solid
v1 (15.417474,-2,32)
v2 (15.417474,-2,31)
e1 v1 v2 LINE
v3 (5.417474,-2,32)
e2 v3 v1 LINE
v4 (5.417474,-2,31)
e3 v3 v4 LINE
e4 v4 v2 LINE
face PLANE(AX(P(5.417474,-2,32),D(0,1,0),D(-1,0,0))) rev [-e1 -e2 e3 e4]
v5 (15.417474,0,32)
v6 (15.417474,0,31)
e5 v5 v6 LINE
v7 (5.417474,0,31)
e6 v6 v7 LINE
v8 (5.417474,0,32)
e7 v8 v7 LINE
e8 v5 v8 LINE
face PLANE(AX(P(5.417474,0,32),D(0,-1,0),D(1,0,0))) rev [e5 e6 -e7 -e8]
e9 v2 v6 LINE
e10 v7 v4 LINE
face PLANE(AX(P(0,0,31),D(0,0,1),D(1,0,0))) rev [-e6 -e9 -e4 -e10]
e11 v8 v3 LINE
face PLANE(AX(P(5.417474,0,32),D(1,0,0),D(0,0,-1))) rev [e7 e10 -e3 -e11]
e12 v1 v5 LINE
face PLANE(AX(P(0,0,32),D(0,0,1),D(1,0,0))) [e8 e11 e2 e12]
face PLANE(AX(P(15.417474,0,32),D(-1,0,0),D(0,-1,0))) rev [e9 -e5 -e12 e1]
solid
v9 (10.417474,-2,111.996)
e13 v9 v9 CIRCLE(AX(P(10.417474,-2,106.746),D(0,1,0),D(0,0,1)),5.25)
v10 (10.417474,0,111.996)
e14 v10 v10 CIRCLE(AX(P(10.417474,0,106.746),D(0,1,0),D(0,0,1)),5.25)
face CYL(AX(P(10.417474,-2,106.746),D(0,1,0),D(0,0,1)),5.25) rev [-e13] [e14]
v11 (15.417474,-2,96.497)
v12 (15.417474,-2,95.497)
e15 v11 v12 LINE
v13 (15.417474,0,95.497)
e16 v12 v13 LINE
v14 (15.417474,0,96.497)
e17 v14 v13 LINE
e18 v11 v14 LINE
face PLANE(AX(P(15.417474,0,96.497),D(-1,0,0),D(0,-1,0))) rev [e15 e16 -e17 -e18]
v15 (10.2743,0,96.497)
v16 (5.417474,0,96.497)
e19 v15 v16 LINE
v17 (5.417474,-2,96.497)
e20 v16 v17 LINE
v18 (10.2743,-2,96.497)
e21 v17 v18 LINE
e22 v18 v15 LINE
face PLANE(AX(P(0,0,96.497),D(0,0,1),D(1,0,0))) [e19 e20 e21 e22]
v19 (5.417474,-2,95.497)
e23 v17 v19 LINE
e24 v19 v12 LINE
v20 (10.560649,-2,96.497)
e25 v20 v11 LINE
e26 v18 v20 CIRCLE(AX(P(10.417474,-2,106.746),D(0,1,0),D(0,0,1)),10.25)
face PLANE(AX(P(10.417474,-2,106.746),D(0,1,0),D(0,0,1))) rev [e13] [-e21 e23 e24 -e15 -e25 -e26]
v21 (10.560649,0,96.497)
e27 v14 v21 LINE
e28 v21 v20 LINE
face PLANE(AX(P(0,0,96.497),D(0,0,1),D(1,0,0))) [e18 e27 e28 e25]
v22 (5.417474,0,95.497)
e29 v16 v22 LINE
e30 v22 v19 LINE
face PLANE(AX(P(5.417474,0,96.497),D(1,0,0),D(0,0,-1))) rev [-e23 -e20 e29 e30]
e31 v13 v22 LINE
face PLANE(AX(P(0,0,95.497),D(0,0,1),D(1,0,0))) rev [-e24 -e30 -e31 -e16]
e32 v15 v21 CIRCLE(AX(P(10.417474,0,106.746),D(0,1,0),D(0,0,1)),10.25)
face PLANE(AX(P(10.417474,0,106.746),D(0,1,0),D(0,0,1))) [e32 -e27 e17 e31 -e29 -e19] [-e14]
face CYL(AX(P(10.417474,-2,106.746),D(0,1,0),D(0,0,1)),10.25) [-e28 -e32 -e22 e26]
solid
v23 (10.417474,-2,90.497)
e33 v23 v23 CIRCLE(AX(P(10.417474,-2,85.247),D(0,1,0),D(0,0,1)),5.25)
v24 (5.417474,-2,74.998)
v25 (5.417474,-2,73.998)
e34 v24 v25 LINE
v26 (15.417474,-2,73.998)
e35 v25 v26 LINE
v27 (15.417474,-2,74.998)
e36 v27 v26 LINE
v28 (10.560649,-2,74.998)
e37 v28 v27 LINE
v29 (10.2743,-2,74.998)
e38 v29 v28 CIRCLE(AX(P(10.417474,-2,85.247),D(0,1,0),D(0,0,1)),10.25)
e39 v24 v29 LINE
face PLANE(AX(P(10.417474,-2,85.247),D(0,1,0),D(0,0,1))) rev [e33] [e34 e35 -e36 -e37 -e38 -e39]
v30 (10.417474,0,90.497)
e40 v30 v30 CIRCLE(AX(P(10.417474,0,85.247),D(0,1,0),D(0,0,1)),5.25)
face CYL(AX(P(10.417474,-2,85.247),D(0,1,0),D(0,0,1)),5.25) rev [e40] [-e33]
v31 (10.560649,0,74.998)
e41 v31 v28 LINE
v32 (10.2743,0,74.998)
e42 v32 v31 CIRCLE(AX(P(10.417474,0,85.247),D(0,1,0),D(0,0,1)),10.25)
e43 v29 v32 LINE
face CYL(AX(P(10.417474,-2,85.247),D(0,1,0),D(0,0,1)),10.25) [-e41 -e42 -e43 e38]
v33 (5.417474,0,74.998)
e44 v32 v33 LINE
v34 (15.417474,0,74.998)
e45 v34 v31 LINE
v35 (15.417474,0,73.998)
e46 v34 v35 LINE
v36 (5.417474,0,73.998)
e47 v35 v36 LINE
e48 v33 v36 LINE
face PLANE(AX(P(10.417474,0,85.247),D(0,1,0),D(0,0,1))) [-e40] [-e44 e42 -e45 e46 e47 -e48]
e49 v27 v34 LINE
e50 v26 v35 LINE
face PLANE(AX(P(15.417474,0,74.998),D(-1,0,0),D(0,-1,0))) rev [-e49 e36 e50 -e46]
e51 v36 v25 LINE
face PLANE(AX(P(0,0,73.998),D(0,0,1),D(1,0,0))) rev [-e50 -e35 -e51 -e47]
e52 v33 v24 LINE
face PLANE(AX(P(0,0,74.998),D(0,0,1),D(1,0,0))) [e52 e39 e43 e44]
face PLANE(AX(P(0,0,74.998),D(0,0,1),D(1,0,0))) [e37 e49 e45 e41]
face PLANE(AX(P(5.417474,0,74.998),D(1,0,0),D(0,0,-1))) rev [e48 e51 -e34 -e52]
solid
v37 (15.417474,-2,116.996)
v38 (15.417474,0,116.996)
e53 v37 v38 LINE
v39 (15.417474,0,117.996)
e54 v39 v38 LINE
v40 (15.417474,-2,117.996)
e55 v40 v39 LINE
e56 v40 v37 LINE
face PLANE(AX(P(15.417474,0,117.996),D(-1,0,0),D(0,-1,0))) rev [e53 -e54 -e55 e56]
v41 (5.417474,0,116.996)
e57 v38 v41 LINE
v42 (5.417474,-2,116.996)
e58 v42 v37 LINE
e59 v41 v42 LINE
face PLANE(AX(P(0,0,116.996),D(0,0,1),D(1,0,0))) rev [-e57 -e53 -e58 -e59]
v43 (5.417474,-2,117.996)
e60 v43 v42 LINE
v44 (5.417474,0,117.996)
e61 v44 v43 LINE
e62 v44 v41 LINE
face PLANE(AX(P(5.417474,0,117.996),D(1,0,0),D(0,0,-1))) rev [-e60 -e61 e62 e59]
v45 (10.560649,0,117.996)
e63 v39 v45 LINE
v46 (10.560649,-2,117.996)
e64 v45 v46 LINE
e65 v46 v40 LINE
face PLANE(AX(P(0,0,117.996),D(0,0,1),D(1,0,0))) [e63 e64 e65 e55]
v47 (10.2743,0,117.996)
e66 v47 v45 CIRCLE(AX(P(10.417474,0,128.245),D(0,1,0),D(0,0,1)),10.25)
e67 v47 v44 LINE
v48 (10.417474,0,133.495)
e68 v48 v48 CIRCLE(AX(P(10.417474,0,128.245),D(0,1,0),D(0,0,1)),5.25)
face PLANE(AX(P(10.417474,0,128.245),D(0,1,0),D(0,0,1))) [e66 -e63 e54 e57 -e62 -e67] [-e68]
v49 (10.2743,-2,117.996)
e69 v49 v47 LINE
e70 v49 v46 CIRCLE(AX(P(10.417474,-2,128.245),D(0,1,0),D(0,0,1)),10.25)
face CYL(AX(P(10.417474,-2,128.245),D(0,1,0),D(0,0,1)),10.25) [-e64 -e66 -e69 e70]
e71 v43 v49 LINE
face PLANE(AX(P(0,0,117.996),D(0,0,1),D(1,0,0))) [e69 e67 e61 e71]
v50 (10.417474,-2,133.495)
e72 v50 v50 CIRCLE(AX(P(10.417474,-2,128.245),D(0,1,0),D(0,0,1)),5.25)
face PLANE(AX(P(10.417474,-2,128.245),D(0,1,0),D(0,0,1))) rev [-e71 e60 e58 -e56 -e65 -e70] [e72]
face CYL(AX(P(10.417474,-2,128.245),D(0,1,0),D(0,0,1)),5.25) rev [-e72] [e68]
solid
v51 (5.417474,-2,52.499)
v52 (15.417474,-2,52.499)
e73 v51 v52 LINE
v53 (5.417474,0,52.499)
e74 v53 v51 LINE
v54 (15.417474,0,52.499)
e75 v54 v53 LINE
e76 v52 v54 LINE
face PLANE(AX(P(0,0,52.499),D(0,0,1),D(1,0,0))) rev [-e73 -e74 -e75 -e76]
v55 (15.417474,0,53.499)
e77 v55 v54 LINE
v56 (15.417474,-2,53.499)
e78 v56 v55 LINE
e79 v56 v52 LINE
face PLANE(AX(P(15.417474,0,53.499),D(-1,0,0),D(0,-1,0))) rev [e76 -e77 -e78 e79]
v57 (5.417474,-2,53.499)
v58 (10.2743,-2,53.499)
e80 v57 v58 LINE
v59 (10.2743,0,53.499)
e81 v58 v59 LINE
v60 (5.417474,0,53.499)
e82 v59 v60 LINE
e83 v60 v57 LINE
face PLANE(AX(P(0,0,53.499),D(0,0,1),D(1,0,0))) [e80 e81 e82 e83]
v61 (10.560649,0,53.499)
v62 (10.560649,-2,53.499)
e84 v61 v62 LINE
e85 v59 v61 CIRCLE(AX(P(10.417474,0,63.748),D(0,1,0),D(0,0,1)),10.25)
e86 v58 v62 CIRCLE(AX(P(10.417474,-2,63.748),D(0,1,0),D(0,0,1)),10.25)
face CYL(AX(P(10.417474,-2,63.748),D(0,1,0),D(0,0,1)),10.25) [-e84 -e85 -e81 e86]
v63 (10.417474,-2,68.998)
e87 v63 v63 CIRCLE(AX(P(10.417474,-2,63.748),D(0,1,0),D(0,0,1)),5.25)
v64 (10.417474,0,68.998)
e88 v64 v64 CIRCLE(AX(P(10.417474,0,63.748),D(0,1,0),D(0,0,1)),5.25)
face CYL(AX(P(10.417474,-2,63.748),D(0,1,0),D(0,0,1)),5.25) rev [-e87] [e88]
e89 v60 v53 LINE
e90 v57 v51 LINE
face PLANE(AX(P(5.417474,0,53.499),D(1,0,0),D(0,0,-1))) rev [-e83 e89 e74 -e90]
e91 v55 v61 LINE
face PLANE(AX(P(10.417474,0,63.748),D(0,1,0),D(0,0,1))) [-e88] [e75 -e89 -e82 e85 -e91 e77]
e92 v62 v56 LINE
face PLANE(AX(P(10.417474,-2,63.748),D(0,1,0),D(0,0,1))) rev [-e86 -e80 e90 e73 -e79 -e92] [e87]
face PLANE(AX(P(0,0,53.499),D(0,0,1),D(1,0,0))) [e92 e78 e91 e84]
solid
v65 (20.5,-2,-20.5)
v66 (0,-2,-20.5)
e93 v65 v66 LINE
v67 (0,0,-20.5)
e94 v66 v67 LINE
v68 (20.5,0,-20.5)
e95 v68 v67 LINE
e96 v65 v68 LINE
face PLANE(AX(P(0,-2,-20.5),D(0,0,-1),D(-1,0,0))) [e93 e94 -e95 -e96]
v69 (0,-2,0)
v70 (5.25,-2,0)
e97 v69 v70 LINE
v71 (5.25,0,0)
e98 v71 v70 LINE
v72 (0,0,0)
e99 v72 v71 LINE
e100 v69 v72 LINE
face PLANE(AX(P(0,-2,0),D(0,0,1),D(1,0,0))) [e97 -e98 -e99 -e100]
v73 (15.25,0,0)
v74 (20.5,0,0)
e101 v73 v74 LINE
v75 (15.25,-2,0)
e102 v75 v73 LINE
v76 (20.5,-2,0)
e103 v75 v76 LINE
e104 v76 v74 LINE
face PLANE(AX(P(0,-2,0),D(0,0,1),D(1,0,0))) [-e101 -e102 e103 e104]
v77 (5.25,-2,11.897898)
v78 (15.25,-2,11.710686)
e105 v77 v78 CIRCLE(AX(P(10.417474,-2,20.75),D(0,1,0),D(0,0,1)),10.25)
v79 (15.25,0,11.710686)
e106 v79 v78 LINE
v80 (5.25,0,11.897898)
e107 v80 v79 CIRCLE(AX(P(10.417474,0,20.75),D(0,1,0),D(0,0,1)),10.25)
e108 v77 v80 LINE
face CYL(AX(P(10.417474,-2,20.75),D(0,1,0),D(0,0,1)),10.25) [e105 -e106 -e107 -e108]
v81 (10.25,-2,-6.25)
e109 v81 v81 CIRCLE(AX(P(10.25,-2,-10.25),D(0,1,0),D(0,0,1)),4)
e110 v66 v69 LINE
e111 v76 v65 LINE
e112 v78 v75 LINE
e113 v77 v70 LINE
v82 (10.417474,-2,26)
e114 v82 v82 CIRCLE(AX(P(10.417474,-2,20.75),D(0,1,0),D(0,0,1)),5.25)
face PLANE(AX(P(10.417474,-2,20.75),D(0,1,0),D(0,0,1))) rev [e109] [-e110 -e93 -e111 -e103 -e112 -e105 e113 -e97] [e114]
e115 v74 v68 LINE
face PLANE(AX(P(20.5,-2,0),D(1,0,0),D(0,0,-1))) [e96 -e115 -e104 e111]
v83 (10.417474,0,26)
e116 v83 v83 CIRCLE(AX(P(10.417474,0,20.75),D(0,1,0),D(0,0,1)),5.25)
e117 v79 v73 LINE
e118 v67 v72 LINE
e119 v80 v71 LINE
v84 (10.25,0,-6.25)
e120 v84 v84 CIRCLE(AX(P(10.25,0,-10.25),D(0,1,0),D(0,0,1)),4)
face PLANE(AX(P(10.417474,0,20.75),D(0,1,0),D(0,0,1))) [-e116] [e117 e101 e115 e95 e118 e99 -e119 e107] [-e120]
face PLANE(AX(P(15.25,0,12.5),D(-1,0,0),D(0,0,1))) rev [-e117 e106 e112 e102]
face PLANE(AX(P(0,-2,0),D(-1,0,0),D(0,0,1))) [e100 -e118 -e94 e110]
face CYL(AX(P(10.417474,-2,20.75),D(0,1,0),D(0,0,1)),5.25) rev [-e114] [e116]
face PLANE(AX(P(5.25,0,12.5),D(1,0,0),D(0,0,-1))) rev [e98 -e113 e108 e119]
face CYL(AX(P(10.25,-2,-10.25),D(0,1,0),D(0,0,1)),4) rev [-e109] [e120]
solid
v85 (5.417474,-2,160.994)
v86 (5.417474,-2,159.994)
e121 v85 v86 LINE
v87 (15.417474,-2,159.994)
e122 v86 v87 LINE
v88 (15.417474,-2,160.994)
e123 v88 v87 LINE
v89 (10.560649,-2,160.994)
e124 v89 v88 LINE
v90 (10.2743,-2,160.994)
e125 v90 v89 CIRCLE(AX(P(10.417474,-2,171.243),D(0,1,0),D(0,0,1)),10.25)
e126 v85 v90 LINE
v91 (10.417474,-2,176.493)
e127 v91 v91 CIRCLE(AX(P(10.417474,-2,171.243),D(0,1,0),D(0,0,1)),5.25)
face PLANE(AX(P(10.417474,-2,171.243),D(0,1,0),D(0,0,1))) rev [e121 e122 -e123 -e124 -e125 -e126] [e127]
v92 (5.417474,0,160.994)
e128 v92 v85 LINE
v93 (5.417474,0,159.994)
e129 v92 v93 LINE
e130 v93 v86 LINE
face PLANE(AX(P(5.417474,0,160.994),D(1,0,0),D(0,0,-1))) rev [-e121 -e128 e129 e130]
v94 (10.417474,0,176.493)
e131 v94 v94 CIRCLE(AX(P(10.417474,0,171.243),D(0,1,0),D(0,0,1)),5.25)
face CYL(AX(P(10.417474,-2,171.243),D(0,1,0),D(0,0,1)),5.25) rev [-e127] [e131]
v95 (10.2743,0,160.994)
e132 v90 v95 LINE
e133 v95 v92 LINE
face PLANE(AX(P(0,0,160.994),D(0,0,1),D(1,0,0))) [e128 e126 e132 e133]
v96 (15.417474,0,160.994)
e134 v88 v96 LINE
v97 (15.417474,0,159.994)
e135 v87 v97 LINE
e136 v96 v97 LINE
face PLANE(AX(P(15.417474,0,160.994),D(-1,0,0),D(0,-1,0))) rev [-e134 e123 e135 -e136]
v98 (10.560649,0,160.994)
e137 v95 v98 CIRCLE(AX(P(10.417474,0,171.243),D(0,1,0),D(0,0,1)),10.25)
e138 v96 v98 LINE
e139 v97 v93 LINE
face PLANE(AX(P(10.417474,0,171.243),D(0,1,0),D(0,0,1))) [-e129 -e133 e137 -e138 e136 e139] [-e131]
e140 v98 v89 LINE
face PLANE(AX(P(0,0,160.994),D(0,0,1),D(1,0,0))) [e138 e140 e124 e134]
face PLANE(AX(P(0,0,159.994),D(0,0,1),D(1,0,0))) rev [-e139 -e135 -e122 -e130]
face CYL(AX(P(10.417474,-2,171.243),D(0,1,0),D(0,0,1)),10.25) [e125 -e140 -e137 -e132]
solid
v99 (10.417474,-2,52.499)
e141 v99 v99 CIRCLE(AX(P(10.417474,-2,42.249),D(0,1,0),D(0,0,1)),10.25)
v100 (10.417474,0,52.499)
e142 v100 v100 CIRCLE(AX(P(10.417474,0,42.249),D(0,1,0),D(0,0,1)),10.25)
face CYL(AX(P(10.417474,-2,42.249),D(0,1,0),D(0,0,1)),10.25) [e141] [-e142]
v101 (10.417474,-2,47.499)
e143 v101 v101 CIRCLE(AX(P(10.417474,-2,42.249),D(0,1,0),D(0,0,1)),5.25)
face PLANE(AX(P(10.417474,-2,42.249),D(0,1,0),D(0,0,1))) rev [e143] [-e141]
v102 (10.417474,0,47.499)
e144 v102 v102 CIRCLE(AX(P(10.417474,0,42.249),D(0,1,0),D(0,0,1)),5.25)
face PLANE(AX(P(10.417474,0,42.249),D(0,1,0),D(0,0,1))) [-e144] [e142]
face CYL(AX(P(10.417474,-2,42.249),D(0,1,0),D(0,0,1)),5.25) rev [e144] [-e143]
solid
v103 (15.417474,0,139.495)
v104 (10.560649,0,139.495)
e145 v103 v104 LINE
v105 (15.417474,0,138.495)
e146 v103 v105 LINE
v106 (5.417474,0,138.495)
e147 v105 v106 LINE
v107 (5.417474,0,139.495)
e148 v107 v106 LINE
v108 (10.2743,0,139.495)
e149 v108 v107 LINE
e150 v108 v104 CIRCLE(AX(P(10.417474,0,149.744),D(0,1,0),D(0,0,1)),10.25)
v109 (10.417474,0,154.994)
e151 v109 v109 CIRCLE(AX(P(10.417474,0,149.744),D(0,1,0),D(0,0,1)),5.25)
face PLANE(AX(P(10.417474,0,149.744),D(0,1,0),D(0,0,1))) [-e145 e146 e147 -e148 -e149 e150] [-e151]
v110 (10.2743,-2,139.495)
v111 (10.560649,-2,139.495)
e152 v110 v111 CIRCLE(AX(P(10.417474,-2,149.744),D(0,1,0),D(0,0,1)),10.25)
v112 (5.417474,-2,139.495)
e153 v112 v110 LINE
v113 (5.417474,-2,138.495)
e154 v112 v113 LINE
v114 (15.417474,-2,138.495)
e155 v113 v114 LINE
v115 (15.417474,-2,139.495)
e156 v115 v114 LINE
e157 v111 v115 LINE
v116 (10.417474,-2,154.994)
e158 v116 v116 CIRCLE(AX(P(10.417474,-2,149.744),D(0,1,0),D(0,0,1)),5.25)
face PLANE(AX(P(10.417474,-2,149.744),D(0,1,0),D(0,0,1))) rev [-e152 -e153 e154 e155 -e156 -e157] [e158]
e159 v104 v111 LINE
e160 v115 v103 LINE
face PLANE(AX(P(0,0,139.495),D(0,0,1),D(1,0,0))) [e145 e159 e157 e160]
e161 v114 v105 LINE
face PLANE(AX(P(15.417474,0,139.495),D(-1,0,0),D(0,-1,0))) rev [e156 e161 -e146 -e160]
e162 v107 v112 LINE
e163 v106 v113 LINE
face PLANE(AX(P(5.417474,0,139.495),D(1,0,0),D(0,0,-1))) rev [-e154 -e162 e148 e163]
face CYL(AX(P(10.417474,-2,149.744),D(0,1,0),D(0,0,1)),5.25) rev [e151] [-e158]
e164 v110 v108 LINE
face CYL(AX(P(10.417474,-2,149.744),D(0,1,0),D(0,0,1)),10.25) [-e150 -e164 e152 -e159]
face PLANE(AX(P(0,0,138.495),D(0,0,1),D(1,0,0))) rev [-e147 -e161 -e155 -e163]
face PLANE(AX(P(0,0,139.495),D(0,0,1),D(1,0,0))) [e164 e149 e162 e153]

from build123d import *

# Parameters (mm, degrees)
SKETCH1_W               = 20.5
SKETCH1_H               = 20.5
BOSS_EXTRUDE1_DEPTH     = 2
SKETCH2_R               = 4
CUT_EXTRUDE1_DEPTH      = 2
SKETCH3_W               = 10
SKETCH3_H               = 2
BOSS_EXTRUDE2_DEPTH     = 12.5
SKETCH6_R               = 10.25
BOSS_EXTRUDE3_DEPTH     = 2
SKETCH7_R               = 5.25
CUT_EXTRUDE2_DEPTH      = 2
SKETCH8_W               = 10
SKETCH8_H               = 2
BOSS_EXTRUDE4_DEPTH     = 1
LPATTERN1_START         = -2
LPATTERN1_OUTLINE_R     = 5.25
LPATTERN1_DEPTH         = 2
LPATTERN1_2_OUTLINE_R   = 5.25
LPATTERN1_2_DEPTH       = 2
LPATTERN1_3_OUTLINE_R   = 5.25
LPATTERN1_3_DEPTH       = 2
LPATTERN1_4_OUTLINE_R   = 5.25
LPATTERN1_4_DEPTH       = 2
LPATTERN1_5_OUTLINE_R   = 5.25
LPATTERN1_5_DEPTH       = 2
LPATTERN1_6_OUTLINE_R   = 5.25
LPATTERN1_6_DEPTH       = 2
LPATTERN1_7_OUTLINE_R   = 10.25
LPATTERN1_7_OUTLINE_R_2 = 5.25
LPATTERN1_7_DEPTH       = 2


with BuildPart() as part:
    # Sketch1 → Boss-Extrude1 (new body)
    with BuildSketch(Plane(origin=(0, 0, 0), x_dir=(1, 0, 0), z_dir=(0, 1, 0))):
        with Locations((10.25, 10.25)):
            Rectangle(SKETCH1_W, SKETCH1_H)
    extrude(amount=-BOSS_EXTRUDE1_DEPTH)

    # Sketch2 → Cut-Extrude1 (cut)
    with BuildSketch(Plane(origin=(0, 0, 0), x_dir=(1, 0, 0), z_dir=(0, 1, 0))):
        with Locations(Location((10.25, 10.25, 0), (0, 0, 270))):
            Circle(SKETCH2_R)
    extrude(amount=-CUT_EXTRUDE1_DEPTH, mode=Mode.SUBTRACT)

    # Sketch3 → Boss-Extrude2 (add)
    with BuildSketch(Plane.XY):
        with Locations((10.25, -1)):
            Rectangle(SKETCH3_W, SKETCH3_H)
    extrude(amount=BOSS_EXTRUDE2_DEPTH)


with BuildPart() as body_2:
    # Sketch6 → Boss-Extrude3 (new body)
    with BuildSketch(Plane(origin=(0, 0, 0), x_dir=(1, 0, 0), z_dir=(0, 1, 0))):
        with Locations(Location((10.417474337, -20.75, 0), (0, 0, 270))):
            Circle(SKETCH6_R)
    extrude(amount=-BOSS_EXTRUDE3_DEPTH)


with BuildPart() as part_1:
    add(part.part)

    # Intersect2: read off the stored shape, not the designer's step
    # Intersect2: union body 2
    add(body_2.part)

    # Sketch7 → Cut-Extrude2 (cut)
    with BuildSketch(Plane(origin=(0, 0, 0), x_dir=(1, 0, 0), z_dir=(0, 1, 0))):
        with Locations(Location((10.417474337, -20.75, 0), (0, 0, 270))):
            Circle(SKETCH7_R)
    extrude(amount=-CUT_EXTRUDE2_DEPTH, mode=Mode.SUBTRACT)


with BuildPart() as body_2_2:
    # Sketch8 → Boss-Extrude4 (new body)
    with BuildSketch(Plane.XY.offset(31)):
        with Locations((10.417474337, -1)):
            Rectangle(SKETCH8_W, SKETCH8_H)
    extrude(amount=BOSS_EXTRUDE4_DEPTH)


with BuildPart() as body_3:
    # LPattern1: read off the stored shape, not the designer's step
    # LPattern1 outline → LPattern1 (new body)
    with BuildSketch(Plane(origin=(0, 0, 0), x_dir=(1, 0, 0), z_dir=(0, 1, 0)).offset(LPATTERN1_START)):
        with BuildLine():
            Line((5.417474337, -160.994), (10.274299619, -160.994))
            ThreePointArc((10.274299619, -160.994), (10.417474338, -181.493), (10.560649056, -160.994))
            Line((10.560649056, -160.994), (15.417474337, -160.994))
            Line((15.417474337, -160.994), (15.417474337, -159.994))
            Line((15.417474337, -159.994), (5.417474337, -159.994))
            Line((5.417474337, -159.994), (5.417474337, -160.994))
        make_face()
        with Locations((10.417474337, -171.243)):
            Circle(LPATTERN1_OUTLINE_R, mode=Mode.SUBTRACT)
    extrude(amount=LPATTERN1_DEPTH)


with BuildPart() as body_4:
    # LPattern1 2 outline → LPattern1 2 (new body)
    with BuildSketch(Plane(origin=(0, 0, 0), x_dir=(1, 0, 0), z_dir=(0, 1, 0)).offset(LPATTERN1_START)):
        with BuildLine():
            Line((5.417474337, -139.495), (10.274299619, -139.495))
            ThreePointArc((10.274299619, -139.495), (10.417474338, -159.994), (10.560649056, -139.495))
            Line((10.560649056, -139.495), (15.417474337, -139.495))
            Line((15.417474337, -139.495), (15.417474337, -138.495))
            Line((15.417474337, -138.495), (5.417474337, -138.495))
            Line((5.417474337, -138.495), (5.417474337, -139.495))
        make_face()
        with Locations((10.417474337, -149.744)):
            Circle(LPATTERN1_2_OUTLINE_R, mode=Mode.SUBTRACT)
    extrude(amount=LPATTERN1_2_DEPTH)


with BuildPart() as body_5:
    # LPattern1 3 outline → LPattern1 3 (new body)
    with BuildSketch(Plane(origin=(0, 0, 0), x_dir=(1, 0, 0), z_dir=(0, 1, 0)).offset(LPATTERN1_START)):
        with BuildLine():
            Line((5.417474337, -117.996), (10.274299619, -117.996))
            ThreePointArc((10.274299619, -117.996), (10.417474338, -138.495), (10.560649056, -117.996))
            Line((10.560649056, -117.996), (15.417474337, -117.996))
            Line((15.417474337, -117.996), (15.417474337, -116.996))
            Line((15.417474337, -116.996), (5.417474337, -116.996))
            Line((5.417474337, -116.996), (5.417474337, -117.996))
        make_face()
        with Locations((10.417474337, -128.245)):
            Circle(LPATTERN1_3_OUTLINE_R, mode=Mode.SUBTRACT)
    extrude(amount=LPATTERN1_3_DEPTH)


with BuildPart() as body_6:
    # LPattern1 4 outline → LPattern1 4 (new body)
    with BuildSketch(Plane(origin=(0, 0, 0), x_dir=(1, 0, 0), z_dir=(0, 1, 0)).offset(LPATTERN1_START)):
        with BuildLine():
            Line((5.417474337, -96.497), (10.274299619, -96.497))
            ThreePointArc((10.274299619, -96.497), (10.417474338, -116.996), (10.560649056, -96.497))
            Line((10.560649056, -96.497), (15.417474337, -96.497))
            Line((15.417474337, -96.497), (15.417474337, -95.497))
            Line((15.417474337, -95.497), (5.417474337, -95.497))
            Line((5.417474337, -95.497), (5.417474337, -96.497))
        make_face()
        with Locations((10.417474337, -106.746)):
            Circle(LPATTERN1_4_OUTLINE_R, mode=Mode.SUBTRACT)
    extrude(amount=LPATTERN1_4_DEPTH)


with BuildPart() as body_7:
    # LPattern1 5 outline → LPattern1 5 (new body)
    with BuildSketch(Plane(origin=(0, 0, 0), x_dir=(1, 0, 0), z_dir=(0, 1, 0)).offset(LPATTERN1_START)):
        with BuildLine():
            Line((5.417474337, -74.998), (10.274299619, -74.998))
            ThreePointArc((10.274299619, -74.998), (10.417474338, -95.497), (10.560649056, -74.998))
            Line((10.560649056, -74.998), (15.417474337, -74.998))
            Line((15.417474337, -74.998), (15.417474337, -73.998))
            Line((15.417474337, -73.998), (5.417474337, -73.998))
            Line((5.417474337, -73.998), (5.417474337, -74.998))
        make_face()
        with Locations((10.417474337, -85.247)):
            Circle(LPATTERN1_5_OUTLINE_R, mode=Mode.SUBTRACT)
    extrude(amount=LPATTERN1_5_DEPTH)


with BuildPart() as body_8:
    # LPattern1 6 outline → LPattern1 6 (new body)
    with BuildSketch(Plane(origin=(0, 0, 0), x_dir=(1, 0, 0), z_dir=(0, 1, 0)).offset(LPATTERN1_START)):
        with BuildLine():
            Line((5.417474337, -53.499), (10.274299619, -53.499))
            ThreePointArc((10.274299619, -53.499), (10.417474338, -73.998), (10.560649056, -53.499))
            Line((10.560649056, -53.499), (15.417474337, -53.499))
            Line((15.417474337, -53.499), (15.417474337, -52.499))
            Line((15.417474337, -52.499), (5.417474337, -52.499))
            Line((5.417474337, -52.499), (5.417474337, -53.499))
        make_face()
        with Locations((10.417474337, -63.748)):
            Circle(LPATTERN1_6_OUTLINE_R, mode=Mode.SUBTRACT)
    extrude(amount=LPATTERN1_6_DEPTH)


with BuildPart() as body_9:
    # LPattern1 7 outline → LPattern1 7 (new body)
    with BuildSketch(Plane(origin=(0, 0, 0), x_dir=(1, 0, 0), z_dir=(0, 1, 0)).offset(LPATTERN1_START)):
        with Locations((10.417474337, -42.249)):
            Circle(LPATTERN1_7_OUTLINE_R)
        with Locations((10.417474337, -42.249)):
            Circle(LPATTERN1_7_OUTLINE_R_2, mode=Mode.SUBTRACT)
    extrude(amount=LPATTERN1_7_DEPTH)


solid = Compound([part_1.part, body_2_2.part, body_3.part, body_4.part, body_5.part, body_6.part, body_7.part, body_8.part, body_9.part])
